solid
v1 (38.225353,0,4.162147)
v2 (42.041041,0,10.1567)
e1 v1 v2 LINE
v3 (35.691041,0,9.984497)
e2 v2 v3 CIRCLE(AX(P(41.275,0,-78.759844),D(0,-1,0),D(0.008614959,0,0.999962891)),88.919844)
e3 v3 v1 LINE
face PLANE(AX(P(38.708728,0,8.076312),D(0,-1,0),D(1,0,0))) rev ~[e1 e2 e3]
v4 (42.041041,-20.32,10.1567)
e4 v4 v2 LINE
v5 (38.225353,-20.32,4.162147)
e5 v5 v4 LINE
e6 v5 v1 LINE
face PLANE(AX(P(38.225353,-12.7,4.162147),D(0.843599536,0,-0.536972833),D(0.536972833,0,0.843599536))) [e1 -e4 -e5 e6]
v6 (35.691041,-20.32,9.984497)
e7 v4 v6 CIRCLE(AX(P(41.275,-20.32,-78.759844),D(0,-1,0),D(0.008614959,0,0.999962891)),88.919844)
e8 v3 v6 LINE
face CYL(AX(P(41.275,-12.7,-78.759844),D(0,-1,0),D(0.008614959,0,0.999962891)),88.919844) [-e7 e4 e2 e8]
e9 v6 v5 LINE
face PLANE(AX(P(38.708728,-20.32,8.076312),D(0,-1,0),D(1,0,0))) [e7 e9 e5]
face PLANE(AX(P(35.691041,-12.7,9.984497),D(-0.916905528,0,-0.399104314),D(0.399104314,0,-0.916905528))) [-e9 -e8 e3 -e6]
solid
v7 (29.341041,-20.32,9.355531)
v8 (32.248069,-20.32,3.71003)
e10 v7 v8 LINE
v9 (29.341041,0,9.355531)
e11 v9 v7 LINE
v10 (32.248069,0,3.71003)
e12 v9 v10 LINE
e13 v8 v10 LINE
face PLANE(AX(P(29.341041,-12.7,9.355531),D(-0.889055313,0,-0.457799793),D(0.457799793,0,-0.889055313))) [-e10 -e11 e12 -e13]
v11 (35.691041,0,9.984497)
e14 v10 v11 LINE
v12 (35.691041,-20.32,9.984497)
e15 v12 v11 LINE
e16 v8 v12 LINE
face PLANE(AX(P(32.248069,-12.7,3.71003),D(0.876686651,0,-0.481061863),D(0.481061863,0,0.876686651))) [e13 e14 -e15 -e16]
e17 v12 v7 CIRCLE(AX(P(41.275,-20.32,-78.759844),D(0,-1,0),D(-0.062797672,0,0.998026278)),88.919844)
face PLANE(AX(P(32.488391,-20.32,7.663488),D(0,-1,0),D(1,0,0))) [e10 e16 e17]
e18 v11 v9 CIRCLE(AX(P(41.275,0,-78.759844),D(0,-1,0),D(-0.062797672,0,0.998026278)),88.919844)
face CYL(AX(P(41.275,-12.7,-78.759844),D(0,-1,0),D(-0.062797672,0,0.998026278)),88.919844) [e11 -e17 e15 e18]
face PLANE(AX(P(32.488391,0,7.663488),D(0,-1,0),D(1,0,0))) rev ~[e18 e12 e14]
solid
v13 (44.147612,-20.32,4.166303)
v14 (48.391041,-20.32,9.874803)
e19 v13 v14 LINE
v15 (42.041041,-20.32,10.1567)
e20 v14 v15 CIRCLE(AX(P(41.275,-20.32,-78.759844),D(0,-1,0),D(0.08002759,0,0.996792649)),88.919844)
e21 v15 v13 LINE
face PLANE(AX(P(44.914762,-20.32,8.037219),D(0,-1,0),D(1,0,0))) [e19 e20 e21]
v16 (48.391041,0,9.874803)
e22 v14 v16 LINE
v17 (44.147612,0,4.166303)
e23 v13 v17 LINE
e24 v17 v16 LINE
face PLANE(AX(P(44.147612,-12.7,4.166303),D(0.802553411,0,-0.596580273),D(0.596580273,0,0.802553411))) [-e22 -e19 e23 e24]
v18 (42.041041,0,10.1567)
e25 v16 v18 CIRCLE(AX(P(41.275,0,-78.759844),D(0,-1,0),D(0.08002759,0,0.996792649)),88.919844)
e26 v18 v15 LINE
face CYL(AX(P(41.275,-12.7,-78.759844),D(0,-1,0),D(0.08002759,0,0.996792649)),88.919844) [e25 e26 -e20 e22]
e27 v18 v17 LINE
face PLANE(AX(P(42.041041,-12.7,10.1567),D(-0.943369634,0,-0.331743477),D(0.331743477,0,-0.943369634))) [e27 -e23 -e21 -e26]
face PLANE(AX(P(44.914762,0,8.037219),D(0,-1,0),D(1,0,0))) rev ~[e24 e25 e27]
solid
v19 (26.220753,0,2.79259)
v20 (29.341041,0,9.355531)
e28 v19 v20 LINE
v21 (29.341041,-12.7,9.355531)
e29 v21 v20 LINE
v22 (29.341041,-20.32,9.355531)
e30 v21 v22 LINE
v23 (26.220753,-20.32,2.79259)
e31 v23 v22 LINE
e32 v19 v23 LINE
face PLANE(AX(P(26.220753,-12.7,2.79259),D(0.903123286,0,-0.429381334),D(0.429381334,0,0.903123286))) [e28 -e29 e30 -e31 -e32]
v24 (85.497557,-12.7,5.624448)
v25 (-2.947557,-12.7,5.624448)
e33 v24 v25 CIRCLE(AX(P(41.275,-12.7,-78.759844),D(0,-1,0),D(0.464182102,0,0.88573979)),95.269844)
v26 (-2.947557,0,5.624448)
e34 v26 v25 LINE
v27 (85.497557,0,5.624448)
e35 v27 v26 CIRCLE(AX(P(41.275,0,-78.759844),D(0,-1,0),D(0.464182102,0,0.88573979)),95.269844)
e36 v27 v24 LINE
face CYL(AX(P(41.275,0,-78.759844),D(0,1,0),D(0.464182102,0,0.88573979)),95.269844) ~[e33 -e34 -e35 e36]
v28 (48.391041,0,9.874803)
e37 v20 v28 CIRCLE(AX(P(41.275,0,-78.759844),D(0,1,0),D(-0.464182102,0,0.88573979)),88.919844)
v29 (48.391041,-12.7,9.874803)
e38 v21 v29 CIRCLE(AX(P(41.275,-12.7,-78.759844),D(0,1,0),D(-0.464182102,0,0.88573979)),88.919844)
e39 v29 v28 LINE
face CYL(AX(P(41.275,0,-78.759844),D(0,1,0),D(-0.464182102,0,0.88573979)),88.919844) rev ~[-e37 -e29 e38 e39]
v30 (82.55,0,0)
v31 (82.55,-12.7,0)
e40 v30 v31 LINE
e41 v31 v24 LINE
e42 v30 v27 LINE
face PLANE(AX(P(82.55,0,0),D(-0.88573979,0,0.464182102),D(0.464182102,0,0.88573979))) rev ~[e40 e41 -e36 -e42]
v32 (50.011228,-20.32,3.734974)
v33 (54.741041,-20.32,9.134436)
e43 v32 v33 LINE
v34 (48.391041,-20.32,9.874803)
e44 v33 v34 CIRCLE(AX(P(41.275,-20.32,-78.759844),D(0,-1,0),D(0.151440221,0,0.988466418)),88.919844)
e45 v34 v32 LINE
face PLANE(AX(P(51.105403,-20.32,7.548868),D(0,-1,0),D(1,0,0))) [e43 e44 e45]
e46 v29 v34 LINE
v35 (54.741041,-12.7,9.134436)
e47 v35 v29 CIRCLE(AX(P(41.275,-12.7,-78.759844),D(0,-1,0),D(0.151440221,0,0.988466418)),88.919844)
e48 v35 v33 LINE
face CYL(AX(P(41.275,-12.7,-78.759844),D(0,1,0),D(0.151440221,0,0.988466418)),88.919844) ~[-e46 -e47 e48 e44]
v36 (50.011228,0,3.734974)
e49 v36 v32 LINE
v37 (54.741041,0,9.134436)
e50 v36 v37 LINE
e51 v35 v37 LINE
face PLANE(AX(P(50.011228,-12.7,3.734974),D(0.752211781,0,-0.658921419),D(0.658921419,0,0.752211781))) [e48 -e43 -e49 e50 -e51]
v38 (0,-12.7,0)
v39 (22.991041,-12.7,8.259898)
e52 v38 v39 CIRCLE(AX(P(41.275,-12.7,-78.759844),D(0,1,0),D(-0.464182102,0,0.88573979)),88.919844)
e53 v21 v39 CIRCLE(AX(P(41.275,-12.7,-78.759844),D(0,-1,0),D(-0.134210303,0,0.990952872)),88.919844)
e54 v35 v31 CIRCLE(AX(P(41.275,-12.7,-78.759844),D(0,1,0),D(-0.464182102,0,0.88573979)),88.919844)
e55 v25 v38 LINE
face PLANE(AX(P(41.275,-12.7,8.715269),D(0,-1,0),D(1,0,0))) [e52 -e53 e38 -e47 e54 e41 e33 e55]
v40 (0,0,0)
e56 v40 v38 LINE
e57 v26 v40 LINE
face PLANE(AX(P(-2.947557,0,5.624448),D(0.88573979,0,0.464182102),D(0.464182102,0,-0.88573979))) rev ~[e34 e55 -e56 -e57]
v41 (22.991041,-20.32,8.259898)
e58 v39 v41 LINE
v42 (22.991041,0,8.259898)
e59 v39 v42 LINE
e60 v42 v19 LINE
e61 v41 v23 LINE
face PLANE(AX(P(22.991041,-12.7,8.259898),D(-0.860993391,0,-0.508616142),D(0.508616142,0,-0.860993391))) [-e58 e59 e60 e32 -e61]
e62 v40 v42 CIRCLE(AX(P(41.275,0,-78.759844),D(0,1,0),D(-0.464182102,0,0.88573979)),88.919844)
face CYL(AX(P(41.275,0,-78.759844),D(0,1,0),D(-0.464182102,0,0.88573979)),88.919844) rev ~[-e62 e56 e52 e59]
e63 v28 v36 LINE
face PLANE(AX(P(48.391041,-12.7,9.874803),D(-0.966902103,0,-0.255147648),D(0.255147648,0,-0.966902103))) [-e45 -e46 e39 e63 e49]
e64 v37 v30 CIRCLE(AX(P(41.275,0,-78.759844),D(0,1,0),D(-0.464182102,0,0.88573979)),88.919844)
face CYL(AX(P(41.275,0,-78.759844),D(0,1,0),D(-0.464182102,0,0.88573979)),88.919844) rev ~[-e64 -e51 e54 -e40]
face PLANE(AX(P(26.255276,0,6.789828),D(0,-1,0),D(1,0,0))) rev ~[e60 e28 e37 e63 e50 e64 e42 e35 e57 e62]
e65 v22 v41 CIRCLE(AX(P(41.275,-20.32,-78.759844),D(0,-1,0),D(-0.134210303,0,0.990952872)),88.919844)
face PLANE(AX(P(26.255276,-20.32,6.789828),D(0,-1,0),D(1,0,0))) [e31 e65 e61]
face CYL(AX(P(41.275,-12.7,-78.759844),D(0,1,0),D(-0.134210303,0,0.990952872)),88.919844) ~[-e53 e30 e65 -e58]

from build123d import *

# Parameters (mm, degrees)
F1_DEPTH      = 12.7
F3_DEPTH      = 7.62
F3_DEPTH_BACK = 12.7


with BuildPart() as f1:
    # F0 (on Front) → F1 (new body)
    with BuildSketch(Plane.XZ):
        with BuildLine():
            Line((-2.947556559, 5.6244480686), (0, 0))
            ThreePointArc((0, 0), (41.275, 10.16), (82.55, 0))
            Line((82.55, 0), (85.497556559, 5.6244480686))
            ThreePointArc((85.497556559, 5.6244480686), (41.275, 16.5100004524), (-2.947556559, 5.6244480686))
        make_face()
    extrude(amount=F1_DEPTH)

    # F2 (on face) → F3, piece 4 (join, two sides)
    with BuildSketch(Plane.XZ.offset(12.7)) as f3_4_sk:
        with BuildLine():
            ThreePointArc((29.3410407992, 9.35553079), (26.156112774, 8.8652546041), (22.9910407992, 8.2598979669))
            Line((22.9910407992, 8.2598979669), (26.2207533036, 2.7925899328))
            Line((26.2207533036, 2.7925899328), (29.3410407992, 9.35553079))
        make_face()
        with BuildLine():
            ThreePointArc((54.7410407992, 9.1344356868), (51.5726966653, 9.561705466), (48.3910407992, 9.8748028385))
            Line((48.3910407992, 9.8748028385), (50.0112283643, 3.7349744815))
            Line((50.0112283643, 3.7349744815), (54.7410407992, 9.1344356868))
        make_face()
    extrude(amount=F3_DEPTH)
    extrude(f3_4_sk.sketch, amount=-F3_DEPTH_BACK)


with BuildPart() as f3:
    # F2 (on face) → F3 (new body, two sides)
    with BuildSketch(Plane.XZ.offset(12.7)) as f3_sk:
        with BuildLine():
            ThreePointArc((35.6910407992, 9.9844969832), (32.5103969914, 9.7269933877), (29.3410407992, 9.35553079))
            Line((29.3410407992, 9.35553079), (32.2480694866, 3.7100295535))
            Line((32.2480694866, 3.7100295535), (35.6910407992, 9.9844969832))
        make_face()
    extrude(amount=F3_DEPTH)
    extrude(f3_sk.sketch, amount=-F3_DEPTH_BACK)


with BuildPart() as f3b:
    # F2 (on face) → F3, piece 2 (new body, two sides)
    with BuildSketch(Plane.XZ.offset(12.7)) as f3_2_sk:
        with BuildLine():
            ThreePointArc((42.0410407992, 10.1567002338), (38.8645025574, 10.1273213224), (35.6910407992, 9.9844969832))
            Line((35.6910407992, 9.9844969832), (38.2253531935, 4.1621468831))
            Line((38.2253531935, 4.1621468831), (42.0410407992, 10.1567002338))
        make_face()
    extrude(amount=F3_DEPTH)
    extrude(f3_2_sk.sketch, amount=-F3_DEPTH_BACK)


with BuildPart() as f3c:
    # F2 (on face) → F3, piece 3 (new body, two sides)
    with BuildSketch(Plane.XZ.offset(12.7)) as f3_3_sk:
        with BuildLine():
            ThreePointArc((48.3910407992, 9.8748028385), (45.2185604619, 10.0725092719), (42.0410407992, 10.1567002338))
            Line((42.0410407992, 10.1567002338), (44.1476118764, 4.1663030602))
            Line((44.1476118764, 4.1663030602), (48.3910407992, 9.8748028385))
        make_face()
    extrude(amount=F3_DEPTH)
    extrude(f3_3_sk.sketch, amount=-F3_DEPTH_BACK)


solid = Compound([f1.part, f3.part, f3b.part, f3c.part])
